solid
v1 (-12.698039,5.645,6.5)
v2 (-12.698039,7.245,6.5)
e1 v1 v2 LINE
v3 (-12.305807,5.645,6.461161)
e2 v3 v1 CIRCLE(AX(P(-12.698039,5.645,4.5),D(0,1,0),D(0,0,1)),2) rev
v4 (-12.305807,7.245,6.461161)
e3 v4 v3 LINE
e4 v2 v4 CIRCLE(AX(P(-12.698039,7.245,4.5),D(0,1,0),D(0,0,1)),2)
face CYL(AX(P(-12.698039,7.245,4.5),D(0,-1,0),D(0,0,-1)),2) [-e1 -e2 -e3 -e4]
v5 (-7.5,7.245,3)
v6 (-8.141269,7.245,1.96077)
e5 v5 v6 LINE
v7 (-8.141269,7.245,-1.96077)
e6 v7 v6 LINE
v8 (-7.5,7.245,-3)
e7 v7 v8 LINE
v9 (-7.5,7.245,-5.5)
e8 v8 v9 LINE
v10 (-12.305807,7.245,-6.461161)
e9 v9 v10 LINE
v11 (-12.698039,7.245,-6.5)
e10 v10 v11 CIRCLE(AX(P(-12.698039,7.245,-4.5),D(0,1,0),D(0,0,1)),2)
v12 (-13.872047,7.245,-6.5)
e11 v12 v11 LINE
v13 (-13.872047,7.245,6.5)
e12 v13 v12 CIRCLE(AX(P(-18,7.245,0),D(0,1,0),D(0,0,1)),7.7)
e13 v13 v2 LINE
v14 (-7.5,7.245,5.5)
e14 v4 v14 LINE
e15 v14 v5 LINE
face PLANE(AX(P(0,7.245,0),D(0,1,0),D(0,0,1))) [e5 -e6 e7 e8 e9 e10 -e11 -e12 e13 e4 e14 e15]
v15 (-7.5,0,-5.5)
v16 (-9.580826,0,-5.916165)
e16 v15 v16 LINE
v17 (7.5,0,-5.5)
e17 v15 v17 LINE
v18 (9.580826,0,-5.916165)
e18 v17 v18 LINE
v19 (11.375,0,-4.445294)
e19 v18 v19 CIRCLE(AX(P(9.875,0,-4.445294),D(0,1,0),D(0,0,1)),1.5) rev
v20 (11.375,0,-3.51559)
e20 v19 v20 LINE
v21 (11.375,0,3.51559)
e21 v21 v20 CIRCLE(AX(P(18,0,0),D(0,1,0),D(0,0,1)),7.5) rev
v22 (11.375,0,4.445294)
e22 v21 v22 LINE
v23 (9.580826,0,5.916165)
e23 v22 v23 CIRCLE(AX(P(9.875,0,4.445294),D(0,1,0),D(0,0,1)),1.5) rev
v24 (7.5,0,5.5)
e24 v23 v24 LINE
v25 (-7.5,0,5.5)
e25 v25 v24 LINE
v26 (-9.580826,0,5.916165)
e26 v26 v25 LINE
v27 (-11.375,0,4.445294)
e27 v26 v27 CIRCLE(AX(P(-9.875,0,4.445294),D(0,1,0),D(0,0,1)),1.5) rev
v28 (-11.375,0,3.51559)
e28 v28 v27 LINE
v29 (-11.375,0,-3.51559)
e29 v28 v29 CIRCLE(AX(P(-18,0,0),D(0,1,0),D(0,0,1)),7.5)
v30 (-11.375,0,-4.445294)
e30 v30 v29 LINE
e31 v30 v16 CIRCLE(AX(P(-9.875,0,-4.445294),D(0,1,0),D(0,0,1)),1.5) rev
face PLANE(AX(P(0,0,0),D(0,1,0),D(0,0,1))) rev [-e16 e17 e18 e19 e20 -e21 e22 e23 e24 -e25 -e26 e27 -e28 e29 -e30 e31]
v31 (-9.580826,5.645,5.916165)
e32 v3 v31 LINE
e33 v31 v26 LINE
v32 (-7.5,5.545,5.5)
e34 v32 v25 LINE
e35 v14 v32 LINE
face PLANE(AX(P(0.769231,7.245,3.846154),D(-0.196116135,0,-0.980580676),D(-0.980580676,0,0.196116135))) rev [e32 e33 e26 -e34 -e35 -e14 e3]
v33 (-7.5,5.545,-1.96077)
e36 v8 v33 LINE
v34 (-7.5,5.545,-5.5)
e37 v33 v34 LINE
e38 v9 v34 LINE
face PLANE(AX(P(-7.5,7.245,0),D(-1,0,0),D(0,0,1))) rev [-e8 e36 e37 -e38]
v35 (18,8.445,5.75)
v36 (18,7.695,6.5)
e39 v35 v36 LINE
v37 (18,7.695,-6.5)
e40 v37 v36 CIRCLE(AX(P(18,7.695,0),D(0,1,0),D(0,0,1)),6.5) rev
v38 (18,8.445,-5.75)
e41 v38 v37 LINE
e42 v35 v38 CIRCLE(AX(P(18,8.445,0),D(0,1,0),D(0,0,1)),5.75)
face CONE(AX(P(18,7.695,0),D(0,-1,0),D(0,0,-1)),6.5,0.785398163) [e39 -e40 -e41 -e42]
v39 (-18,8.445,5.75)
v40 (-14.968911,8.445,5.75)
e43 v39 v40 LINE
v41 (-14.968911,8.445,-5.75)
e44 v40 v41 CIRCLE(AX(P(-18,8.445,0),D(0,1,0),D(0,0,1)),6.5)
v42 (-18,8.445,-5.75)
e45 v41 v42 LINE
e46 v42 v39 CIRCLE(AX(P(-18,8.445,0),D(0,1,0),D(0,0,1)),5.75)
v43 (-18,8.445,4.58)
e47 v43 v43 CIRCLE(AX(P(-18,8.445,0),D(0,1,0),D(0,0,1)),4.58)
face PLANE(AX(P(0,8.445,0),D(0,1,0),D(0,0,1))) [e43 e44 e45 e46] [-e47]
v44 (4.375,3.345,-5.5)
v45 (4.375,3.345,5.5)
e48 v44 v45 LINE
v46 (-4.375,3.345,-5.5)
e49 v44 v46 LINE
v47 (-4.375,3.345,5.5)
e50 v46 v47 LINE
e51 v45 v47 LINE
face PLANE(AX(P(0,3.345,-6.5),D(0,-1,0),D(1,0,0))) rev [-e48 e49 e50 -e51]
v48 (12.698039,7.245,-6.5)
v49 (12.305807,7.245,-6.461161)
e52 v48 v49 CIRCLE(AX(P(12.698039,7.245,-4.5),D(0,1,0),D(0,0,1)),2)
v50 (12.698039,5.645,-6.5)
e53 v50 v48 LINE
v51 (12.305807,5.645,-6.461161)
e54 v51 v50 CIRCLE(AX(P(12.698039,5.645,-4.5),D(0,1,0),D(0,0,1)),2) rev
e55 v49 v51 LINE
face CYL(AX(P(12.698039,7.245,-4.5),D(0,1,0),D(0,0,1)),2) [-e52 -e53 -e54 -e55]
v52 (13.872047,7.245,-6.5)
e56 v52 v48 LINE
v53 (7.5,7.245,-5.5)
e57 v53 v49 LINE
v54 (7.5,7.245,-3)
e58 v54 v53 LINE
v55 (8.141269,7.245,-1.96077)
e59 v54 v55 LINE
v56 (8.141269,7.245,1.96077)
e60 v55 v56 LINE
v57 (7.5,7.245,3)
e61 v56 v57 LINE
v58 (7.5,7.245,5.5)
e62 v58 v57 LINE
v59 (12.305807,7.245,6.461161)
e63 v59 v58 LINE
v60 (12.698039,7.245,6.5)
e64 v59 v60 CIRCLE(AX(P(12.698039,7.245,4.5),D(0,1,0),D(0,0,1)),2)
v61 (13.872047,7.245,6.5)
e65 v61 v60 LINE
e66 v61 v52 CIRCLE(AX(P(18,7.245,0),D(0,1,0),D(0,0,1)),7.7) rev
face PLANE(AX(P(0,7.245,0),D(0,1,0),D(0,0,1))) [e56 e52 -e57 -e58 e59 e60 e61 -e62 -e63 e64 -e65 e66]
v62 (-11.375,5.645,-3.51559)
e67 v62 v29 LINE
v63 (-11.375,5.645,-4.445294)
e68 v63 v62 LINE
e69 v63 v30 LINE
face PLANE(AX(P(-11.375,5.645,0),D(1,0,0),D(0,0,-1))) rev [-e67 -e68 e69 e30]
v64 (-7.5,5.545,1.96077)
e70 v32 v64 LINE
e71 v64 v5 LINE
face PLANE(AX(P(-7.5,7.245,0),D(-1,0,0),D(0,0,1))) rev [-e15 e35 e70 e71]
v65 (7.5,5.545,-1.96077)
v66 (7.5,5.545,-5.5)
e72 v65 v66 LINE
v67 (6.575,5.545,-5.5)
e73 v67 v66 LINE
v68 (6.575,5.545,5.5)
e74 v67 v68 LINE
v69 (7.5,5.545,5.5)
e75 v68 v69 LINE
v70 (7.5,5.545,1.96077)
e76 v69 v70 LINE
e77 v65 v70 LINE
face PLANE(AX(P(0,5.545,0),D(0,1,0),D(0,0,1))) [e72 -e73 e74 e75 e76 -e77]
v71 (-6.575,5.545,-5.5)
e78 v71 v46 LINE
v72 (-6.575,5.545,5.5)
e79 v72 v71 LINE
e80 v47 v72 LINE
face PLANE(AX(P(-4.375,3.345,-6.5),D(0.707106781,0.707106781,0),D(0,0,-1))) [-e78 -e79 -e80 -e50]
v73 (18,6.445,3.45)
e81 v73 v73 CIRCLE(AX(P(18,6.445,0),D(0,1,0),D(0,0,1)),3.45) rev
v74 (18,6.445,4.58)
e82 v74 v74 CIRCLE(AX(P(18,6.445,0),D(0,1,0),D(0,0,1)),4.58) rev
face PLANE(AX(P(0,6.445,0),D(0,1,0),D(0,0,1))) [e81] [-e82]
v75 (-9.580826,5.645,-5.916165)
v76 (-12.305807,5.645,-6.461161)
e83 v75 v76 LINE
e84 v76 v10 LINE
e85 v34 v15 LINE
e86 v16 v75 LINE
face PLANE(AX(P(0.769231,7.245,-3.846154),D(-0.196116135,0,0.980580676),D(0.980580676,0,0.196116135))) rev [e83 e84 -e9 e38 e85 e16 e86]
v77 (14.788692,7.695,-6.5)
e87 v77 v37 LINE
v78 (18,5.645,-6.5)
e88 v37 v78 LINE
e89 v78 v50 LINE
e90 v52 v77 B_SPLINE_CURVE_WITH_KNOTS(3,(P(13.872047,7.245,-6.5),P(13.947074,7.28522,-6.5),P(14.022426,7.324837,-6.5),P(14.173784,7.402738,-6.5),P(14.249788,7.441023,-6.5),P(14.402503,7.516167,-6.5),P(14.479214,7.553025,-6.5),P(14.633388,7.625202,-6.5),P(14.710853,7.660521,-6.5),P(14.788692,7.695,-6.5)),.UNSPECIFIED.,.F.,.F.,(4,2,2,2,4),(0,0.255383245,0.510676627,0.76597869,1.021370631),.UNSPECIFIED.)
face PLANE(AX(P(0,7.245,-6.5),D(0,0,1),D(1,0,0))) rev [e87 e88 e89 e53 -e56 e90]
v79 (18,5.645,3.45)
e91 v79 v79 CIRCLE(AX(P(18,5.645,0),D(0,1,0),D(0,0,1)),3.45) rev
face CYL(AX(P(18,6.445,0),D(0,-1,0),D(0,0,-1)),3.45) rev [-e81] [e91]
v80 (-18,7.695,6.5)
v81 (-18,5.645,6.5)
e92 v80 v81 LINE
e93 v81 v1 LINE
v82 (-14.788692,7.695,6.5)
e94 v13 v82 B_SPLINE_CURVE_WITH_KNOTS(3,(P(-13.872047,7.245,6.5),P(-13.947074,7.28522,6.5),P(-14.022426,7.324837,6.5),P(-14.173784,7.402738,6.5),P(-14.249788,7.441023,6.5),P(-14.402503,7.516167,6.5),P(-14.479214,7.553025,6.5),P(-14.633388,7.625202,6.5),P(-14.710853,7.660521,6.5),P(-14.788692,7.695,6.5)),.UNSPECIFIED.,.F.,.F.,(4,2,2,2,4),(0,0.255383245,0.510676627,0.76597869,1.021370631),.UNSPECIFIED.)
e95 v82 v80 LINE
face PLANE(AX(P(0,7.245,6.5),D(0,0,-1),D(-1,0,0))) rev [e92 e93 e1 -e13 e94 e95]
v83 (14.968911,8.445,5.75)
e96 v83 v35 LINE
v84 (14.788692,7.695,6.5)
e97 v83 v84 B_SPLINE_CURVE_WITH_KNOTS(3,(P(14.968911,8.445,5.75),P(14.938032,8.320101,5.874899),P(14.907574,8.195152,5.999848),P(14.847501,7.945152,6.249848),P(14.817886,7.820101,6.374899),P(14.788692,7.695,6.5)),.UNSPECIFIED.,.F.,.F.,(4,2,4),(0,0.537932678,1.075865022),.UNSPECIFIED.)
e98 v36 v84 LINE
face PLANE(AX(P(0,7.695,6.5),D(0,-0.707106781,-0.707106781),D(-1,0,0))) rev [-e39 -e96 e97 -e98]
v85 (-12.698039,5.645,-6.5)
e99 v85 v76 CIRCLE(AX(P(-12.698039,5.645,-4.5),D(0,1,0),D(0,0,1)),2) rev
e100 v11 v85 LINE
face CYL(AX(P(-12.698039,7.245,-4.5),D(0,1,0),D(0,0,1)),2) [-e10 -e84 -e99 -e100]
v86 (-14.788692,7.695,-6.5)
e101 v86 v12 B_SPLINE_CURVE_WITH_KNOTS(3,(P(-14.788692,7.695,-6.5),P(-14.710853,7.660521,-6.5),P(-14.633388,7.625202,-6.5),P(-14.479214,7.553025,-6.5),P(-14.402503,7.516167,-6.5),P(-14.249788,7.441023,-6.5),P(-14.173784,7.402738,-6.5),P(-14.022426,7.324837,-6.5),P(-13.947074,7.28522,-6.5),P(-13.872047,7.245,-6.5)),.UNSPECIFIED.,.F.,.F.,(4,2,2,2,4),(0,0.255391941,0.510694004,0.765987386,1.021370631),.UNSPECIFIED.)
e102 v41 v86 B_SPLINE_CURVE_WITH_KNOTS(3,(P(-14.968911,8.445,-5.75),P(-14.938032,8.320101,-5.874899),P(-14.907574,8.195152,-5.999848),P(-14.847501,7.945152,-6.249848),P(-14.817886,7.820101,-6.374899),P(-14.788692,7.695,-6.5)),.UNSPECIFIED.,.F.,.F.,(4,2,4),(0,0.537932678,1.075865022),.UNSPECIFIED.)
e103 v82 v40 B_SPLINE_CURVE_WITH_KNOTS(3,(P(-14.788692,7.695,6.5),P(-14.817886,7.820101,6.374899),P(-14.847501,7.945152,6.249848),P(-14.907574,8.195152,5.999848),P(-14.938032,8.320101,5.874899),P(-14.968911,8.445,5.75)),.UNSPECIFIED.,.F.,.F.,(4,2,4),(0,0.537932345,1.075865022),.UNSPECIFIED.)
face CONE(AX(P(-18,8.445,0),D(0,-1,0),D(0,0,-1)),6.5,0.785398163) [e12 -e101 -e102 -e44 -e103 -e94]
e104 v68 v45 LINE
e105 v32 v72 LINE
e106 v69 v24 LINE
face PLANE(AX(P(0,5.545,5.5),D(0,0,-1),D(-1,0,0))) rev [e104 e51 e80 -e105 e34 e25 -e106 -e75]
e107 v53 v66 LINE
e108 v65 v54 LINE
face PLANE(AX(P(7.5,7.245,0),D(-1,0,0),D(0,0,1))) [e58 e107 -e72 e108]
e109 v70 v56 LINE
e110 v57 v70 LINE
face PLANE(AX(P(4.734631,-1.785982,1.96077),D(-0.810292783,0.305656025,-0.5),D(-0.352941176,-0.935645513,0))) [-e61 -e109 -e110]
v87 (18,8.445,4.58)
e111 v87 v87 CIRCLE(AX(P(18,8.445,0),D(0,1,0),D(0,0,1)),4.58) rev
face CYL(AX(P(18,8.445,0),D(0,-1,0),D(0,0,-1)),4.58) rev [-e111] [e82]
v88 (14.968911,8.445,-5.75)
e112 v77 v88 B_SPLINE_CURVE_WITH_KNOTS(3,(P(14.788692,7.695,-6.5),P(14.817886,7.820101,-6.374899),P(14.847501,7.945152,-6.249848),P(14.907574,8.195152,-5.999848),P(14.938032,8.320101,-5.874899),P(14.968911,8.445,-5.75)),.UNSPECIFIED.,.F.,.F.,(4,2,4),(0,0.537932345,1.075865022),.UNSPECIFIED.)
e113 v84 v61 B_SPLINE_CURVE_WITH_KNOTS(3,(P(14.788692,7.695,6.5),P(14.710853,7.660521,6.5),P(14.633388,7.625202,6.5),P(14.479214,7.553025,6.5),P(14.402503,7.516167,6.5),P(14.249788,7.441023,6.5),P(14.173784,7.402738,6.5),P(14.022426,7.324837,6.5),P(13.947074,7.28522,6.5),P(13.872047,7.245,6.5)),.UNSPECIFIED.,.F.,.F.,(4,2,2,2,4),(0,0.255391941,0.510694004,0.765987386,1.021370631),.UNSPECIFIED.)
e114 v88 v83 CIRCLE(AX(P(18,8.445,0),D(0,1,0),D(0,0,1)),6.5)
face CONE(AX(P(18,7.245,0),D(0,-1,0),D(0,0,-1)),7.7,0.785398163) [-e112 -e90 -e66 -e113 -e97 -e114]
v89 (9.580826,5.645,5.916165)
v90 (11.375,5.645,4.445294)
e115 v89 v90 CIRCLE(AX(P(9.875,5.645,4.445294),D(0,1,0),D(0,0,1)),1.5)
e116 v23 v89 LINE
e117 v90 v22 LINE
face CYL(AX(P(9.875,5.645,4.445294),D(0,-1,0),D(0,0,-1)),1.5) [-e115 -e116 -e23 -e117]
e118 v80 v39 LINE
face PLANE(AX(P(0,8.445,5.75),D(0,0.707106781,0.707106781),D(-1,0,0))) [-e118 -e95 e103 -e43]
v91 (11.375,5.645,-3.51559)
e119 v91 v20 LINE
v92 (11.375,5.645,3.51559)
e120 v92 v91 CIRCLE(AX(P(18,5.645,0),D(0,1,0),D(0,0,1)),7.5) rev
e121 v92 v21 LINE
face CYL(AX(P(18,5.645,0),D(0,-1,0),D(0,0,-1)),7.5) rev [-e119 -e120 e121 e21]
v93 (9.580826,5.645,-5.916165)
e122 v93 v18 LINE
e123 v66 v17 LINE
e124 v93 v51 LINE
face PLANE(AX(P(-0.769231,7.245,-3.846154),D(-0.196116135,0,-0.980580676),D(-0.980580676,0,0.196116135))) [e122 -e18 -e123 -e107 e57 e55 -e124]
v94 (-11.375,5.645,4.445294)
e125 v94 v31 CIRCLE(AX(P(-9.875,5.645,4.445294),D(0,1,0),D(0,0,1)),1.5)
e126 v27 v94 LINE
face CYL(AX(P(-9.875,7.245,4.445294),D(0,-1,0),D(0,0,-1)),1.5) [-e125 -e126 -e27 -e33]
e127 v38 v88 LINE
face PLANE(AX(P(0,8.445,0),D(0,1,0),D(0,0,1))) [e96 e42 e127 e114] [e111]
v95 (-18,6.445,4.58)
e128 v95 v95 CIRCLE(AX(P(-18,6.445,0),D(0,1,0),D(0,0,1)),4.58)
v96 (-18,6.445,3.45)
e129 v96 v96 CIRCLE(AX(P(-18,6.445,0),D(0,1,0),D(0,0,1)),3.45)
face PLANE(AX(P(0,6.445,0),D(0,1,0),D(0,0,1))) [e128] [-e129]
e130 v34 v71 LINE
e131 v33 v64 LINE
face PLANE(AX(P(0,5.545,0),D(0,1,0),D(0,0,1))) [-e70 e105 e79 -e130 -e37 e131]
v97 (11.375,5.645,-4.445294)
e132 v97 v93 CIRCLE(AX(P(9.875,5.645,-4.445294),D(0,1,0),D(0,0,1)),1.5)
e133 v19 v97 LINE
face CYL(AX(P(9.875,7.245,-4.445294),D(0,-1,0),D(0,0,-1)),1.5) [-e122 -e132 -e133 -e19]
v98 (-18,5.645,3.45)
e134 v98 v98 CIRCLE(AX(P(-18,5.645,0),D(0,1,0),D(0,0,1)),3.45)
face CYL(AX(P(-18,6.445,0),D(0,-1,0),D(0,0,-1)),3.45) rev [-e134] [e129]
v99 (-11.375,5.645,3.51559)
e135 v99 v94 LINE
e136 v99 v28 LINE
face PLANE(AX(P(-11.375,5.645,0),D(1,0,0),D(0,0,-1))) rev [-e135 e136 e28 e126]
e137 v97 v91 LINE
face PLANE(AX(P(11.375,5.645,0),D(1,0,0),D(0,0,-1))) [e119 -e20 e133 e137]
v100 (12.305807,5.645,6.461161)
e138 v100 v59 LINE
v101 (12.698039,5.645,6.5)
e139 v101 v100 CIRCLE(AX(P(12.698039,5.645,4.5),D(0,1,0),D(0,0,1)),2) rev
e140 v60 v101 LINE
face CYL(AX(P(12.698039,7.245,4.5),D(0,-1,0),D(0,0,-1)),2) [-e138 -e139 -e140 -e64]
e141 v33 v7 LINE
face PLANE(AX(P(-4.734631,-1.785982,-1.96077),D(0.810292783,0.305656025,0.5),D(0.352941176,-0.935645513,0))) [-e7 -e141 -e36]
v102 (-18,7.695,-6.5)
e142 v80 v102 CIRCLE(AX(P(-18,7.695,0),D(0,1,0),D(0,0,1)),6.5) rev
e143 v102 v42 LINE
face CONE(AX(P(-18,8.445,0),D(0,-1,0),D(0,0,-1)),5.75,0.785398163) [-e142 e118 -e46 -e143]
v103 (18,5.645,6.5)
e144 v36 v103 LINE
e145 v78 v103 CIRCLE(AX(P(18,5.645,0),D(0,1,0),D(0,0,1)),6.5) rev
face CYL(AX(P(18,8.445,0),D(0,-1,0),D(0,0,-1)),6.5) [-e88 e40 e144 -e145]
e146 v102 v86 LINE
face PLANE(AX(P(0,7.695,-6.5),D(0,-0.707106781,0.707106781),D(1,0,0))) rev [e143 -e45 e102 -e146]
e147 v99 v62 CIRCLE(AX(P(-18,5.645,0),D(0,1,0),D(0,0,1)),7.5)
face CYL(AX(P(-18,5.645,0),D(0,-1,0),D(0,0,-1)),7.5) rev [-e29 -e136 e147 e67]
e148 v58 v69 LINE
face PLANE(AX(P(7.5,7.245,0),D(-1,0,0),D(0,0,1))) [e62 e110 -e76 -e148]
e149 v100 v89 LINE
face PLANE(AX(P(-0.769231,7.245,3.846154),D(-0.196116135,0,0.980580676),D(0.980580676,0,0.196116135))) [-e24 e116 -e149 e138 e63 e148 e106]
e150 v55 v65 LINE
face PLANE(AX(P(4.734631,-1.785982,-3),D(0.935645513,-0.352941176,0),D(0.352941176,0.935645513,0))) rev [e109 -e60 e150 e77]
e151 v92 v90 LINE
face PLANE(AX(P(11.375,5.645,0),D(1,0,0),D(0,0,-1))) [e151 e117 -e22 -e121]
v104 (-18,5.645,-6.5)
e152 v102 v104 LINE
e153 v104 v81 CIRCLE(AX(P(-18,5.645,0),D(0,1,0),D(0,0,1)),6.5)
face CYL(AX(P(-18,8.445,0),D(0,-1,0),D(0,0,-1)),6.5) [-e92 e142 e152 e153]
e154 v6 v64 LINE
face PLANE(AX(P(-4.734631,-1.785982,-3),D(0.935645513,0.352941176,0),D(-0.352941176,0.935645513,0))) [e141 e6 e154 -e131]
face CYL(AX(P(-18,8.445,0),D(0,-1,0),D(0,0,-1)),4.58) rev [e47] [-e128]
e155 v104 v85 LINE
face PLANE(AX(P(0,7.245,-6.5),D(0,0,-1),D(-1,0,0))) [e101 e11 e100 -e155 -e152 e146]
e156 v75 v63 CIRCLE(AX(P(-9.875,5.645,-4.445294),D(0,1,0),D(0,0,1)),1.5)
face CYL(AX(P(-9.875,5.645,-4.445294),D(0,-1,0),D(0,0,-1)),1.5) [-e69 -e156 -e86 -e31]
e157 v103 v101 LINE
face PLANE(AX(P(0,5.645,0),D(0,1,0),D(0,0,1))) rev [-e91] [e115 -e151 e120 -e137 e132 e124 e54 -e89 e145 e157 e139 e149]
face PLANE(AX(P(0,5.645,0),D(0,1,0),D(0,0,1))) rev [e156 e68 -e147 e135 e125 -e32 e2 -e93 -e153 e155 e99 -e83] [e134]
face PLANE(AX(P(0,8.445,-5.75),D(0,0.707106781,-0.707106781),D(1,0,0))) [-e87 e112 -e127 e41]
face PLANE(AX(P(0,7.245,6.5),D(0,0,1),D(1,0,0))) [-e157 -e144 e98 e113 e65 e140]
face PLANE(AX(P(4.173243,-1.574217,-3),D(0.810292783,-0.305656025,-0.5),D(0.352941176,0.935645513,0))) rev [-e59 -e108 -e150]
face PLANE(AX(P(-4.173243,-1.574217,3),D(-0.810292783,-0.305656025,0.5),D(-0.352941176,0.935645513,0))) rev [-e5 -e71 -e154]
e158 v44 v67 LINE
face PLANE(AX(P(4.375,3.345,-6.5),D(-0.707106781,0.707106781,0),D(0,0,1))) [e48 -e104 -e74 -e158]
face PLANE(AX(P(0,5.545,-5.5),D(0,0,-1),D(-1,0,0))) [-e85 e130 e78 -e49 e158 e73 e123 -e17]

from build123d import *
from OCP.BRepFilletAPI import BRepFilletAPI_MakeChamfer

# Parameters (mm, degrees)
SKETCH1_W               = 15
SKETCH1_H               = 11
BOSS_EXTRUDE1_DEPTH     = 5.545
BOSS_EXTRUDE2_DEPTH     = 7.245
SKETCH1_6_R             = 6.5
SKETCH1_6_R_2           = 4.58
BOSS_EXTRUDE3_DEPTH     = 8.445
SKETCH1_7_R             = 4.58
SKETCH1_7_R_2           = 3.45
BOSS_EXTRUDE4_DEPTH     = 6.445
SKETCH1_8_R             = 6.5
SKETCH1_8_R_2           = 4.58
SKETCH1_8_R_3           = 3.45
CUT_EXTRUDE1_DEPTH      = 5.645
CUT_EXTRUDE2_DEPTH      = 3
CUT_EXTRUDE3_DEPTH      = 27.717373093
CUT_EXTRUDE3_DEPTH_BACK = 27.717373093
SKETCH2_4_W             = 8.75
SKETCH2_4_H             = 2.2
CHAMFER1_SIZE           = 1.039230485
CHAMFER1_SIZE_2         = 0.6
CHAMFER2_SIZE           = 2.2
CHAMFER3_SIZE           = 0.75
CHAMFER4_SIZE           = 1.2
FILLET1_R               = 2
FILLET2_R               = 1.5


with BuildPart() as part:
    # Sketch1 → Boss-Extrude1 (new body)
    with BuildSketch(Plane(origin=(0, 0, 0), x_dir=(1, 0, 0), z_dir=(0, 1, 0))):
        Rectangle(SKETCH1_W, SKETCH1_H)
    extrude(amount=BOSS_EXTRUDE1_DEPTH)

    # Sketch1<5> → Boss-Extrude2 (add)
    with BuildSketch(Plane(origin=(0, 0, 0), x_dir=(1, 0, 0), z_dir=(0, 1, 0))):
        with BuildLine():
            Line((-12.5, 6.5), (-13.872046512, 6.5))
            ThreePointArc((-13.872046512, 6.5), (-12.47142118, 5.359553734), (-11.375, 3.924203741))
            Line((-11.375, 3.924203741), (-11.375, 6.275))
            Line((-11.375, 6.275), (-12.5, 6.5))
        make_face()
        with BuildLine():
            Line((-11.375, 6.275), (-11.375, 3.924203741))
            ThreePointArc((-11.375, 3.924203741), (-10.3, 0), (-11.375, -3.924203741))
            Line((-11.375, -3.924203741), (-11.375, -6.275))
            Line((-11.375, -6.275), (-7.5, -5.5))
            Line((-7.5, -5.5), (-7.5, 5.5))
            Line((-7.5, 5.5), (-11.375, 6.275))
        make_face()
        with BuildLine():
            ThreePointArc((-11.375, -3.924203741), (-12.47142118, -5.359553734), (-13.872046512, -6.5))
            Line((-13.872046512, -6.5), (-12.5, -6.5))
            Line((-12.5, -6.5), (-11.375, -6.275))
            Line((-11.375, -6.275), (-11.375, -3.924203741))
        make_face()
        with BuildLine():
            Line((12.5, 6.5), (11.375, 6.275))
            Line((11.375, 6.275), (11.375, 3.924203741))
            ThreePointArc((11.375, 3.924203741), (12.47142118, 5.359553734), (13.872046512, 6.5))
            Line((13.872046512, 6.5), (12.5, 6.5))
        make_face()
        with BuildLine():
            Line((11.375, 6.275), (7.5, 5.5))
            Line((7.5, 5.5), (7.5, -5.5))
            Line((7.5, -5.5), (11.375, -6.275))
            Line((11.375, -6.275), (11.375, -3.924203741))
            ThreePointArc((11.375, -3.924203741), (10.3, 0), (11.375, 3.924203741))
            Line((11.375, 3.924203741), (11.375, 6.275))
        make_face()
        with BuildLine():
            Line((11.375, -3.924203741), (11.375, -6.275))
            Line((11.375, -6.275), (12.5, -6.5))
            Line((12.5, -6.5), (13.872046512, -6.5))
            ThreePointArc((13.872046512, -6.5), (12.47142118, -5.359553734), (11.375, -3.924203741))
        make_face()
    extrude(amount=BOSS_EXTRUDE2_DEPTH)

    # Sketch1<6> → Boss-Extrude3 (add)
    # profile 1 of 6: a face of its own
    with BuildSketch(Plane(origin=(0, 0, 0), x_dir=(1, 0, 0), z_dir=(0, 1, 0))):
        with BuildLine():
            Line((-13.872046512, 6.5), (-18, 6.5))
            ThreePointArc((-18, 6.5), (-13.403805922, 4.596194078), (-11.5, 0))
            ThreePointArc((-11.5, 0), (-13.403805922, -4.596194078), (-18, -6.5))
            Line((-18, -6.5), (-13.872046512, -6.5))
            ThreePointArc((-13.872046512, -6.5), (-12.47142118, -5.359553734), (-11.375, -3.924203741))
            Line((-11.375, -3.924203741), (-11.375, -3.515590278))
            ThreePointArc((-11.375, -3.515590278), (-10.5, 0), (-11.375, 3.515590278))
            Line((-11.375, 3.515590278), (-11.375, 3.924203741))
            ThreePointArc((-11.375, 3.924203741), (-12.47142118, 5.359553734), (-13.872046512, 6.5))
        make_face()
    # profile 2 of 6: a face of its own
    with BuildSketch(Plane(origin=(0, 0, 0), x_dir=(1, 0, 0), z_dir=(0, 1, 0))):
        with Locations((-18, 0)):
            Circle(SKETCH1_6_R)
        with Locations(Location((-18, 0, 0), (0, 0, 270))):
            Circle(SKETCH1_6_R_2, mode=Mode.SUBTRACT)
    # profile 3 of 6: a face of its own
    with BuildSketch(Plane(origin=(0, 0, 0), x_dir=(1, 0, 0), z_dir=(0, 1, 0))):
        with BuildLine():
            ThreePointArc((13.872046512, 6.5), (12.47142118, 5.359553734), (11.375, 3.924203741))
            Line((11.375, 3.924203741), (11.375, 3.515590278))
            ThreePointArc((11.375, 3.515590278), (10.5, 0), (11.375, -3.515590278))
            Line((11.375, -3.515590278), (11.375, -3.924203741))
            ThreePointArc((11.375, -3.924203741), (12.47142118, -5.359553734), (13.872046512, -6.5))
            Line((13.872046512, -6.5), (18, -6.5))
            ThreePointArc((18, -6.5), (11.5, 0), (18, 6.5))
            Line((18, 6.5), (13.872046512, 6.5))
        make_face()
    # profile 4 of 6: a face of its own
    with BuildSketch(Plane(origin=(0, 0, 0), x_dir=(1, 0, 0), z_dir=(0, 1, 0))):
        with Locations((18, 0)):
            Circle(SKETCH1_6_R)
        with Locations(Location((18, 0, 0), (0, 0, 270))):
            Circle(SKETCH1_6_R_2, mode=Mode.SUBTRACT)
    # profile 5 of 6: a face of its own
    with BuildSketch(Plane(origin=(0, 0, 0), x_dir=(1, 0, 0), z_dir=(0, 1, 0))):
        with BuildLine():
            Line((11.375, 3.515590278), (11.375, 3.924203741))
            ThreePointArc((11.375, 3.924203741), (10.3, 0), (11.375, -3.924203741))
            Line((11.375, -3.924203741), (11.375, -3.515590278))
            ThreePointArc((11.375, -3.515590278), (10.5, 0), (11.375, 3.515590278))
        make_face()
    # profile 6 of 6: a face of its own
    with BuildSketch(Plane(origin=(0, 0, 0), x_dir=(1, 0, 0), z_dir=(0, 1, 0))):
        with BuildLine():
            ThreePointArc((-11.375, -3.924203741), (-10.3, 0), (-11.375, 3.924203741))
            Line((-11.375, 3.924203741), (-11.375, 3.515590278))
            ThreePointArc((-11.375, 3.515590278), (-10.5, 0), (-11.375, -3.515590278))
            Line((-11.375, -3.515590278), (-11.375, -3.924203741))
        make_face()
    extrude(amount=BOSS_EXTRUDE3_DEPTH)

    # Sketch1<7> → Boss-Extrude4 (add)
    # profile 1 of 2: a face of its own
    with BuildSketch(Plane(origin=(0, 0, 0), x_dir=(1, 0, 0), z_dir=(0, 1, 0))):
        with Locations(Location((-18, 0, 0), (0, 0, 270))):
            Circle(SKETCH1_7_R)
        with Locations(Location((-18, 0, 0), (0, 0, 270))):
            Circle(SKETCH1_7_R_2, mode=Mode.SUBTRACT)
    # profile 2 of 2: a face of its own
    with BuildSketch(Plane(origin=(0, 0, 0), x_dir=(1, 0, 0), z_dir=(0, 1, 0))):
        with Locations(Location((18, 0, 0), (0, 0, 270))):
            Circle(SKETCH1_7_R)
        with Locations(Location((18, 0, 0), (0, 0, 270))):
            Circle(SKETCH1_7_R_2, mode=Mode.SUBTRACT)
    extrude(amount=BOSS_EXTRUDE4_DEPTH)

    # Sketch1<8> → Cut-Extrude1 (cut)
    # profile 1 of 10: a face of its own
    with BuildSketch(Plane(origin=(0, 0, 0), x_dir=(1, 0, 0), z_dir=(0, 1, 0))):
        with Locations((-18, 0)):
            Circle(SKETCH1_8_R)
        with Locations(Location((-18, 0, 0), (0, 0, 270))):
            Circle(SKETCH1_8_R_2, mode=Mode.SUBTRACT)
    # profile 2 of 10: a face of its own
    with BuildSketch(Plane(origin=(0, 0, 0), x_dir=(1, 0, 0), z_dir=(0, 1, 0))):
        with Locations(Location((-18, 0, 0), (0, 0, 270))):
            Circle(SKETCH1_8_R_2)
        with Locations(Location((-18, 0, 0), (0, 0, 270))):
            Circle(SKETCH1_8_R_3, mode=Mode.SUBTRACT)
    # profile 3 of 10: a face of its own
    with BuildSketch(Plane(origin=(0, 0, 0), x_dir=(1, 0, 0), z_dir=(0, 1, 0))):
        with BuildLine():
            Line((-13.872046512, 6.5), (-18, 6.5))
            ThreePointArc((-18, 6.5), (-13.403805922, 4.596194078), (-11.5, 0))
            ThreePointArc((-11.5, 0), (-13.403805922, -4.596194078), (-18, -6.5))
            Line((-18, -6.5), (-13.872046512, -6.5))
            ThreePointArc((-13.872046512, -6.5), (-12.47142118, -5.359553734), (-11.375, -3.924203741))
            Line((-11.375, -3.924203741), (-11.375, -3.515590278))
            ThreePointArc((-11.375, -3.515590278), (-10.5, 0), (-11.375, 3.515590278))
            Line((-11.375, 3.515590278), (-11.375, 3.924203741))
            ThreePointArc((-11.375, 3.924203741), (-12.47142118, 5.359553734), (-13.872046512, 6.5))
        make_face()
    # profile 4 of 10: a face of its own
    with BuildSketch(Plane(origin=(0, 0, 0), x_dir=(1, 0, 0), z_dir=(0, 1, 0))):
        with BuildLine():
            Line((-12.5, 6.5), (-13.872046512, 6.5))
            ThreePointArc((-13.872046512, 6.5), (-12.47142118, 5.359553734), (-11.375, 3.924203741))
            Line((-11.375, 3.924203741), (-11.375, 6.275))
            Line((-11.375, 6.275), (-12.5, 6.5))
        make_face()
    # profile 5 of 10: a face of its own
    with BuildSketch(Plane(origin=(0, 0, 0), x_dir=(1, 0, 0), z_dir=(0, 1, 0))):
        with BuildLine():
            ThreePointArc((-11.375, -3.924203741), (-12.47142118, -5.359553734), (-13.872046512, -6.5))
            Line((-13.872046512, -6.5), (-12.5, -6.5))
            Line((-12.5, -6.5), (-11.375, -6.275))
            Line((-11.375, -6.275), (-11.375, -3.924203741))
        make_face()
    # profile 6 of 10: a face of its own
    with BuildSketch(Plane(origin=(0, 0, 0), x_dir=(1, 0, 0), z_dir=(0, 1, 0))):
        with BuildLine():
            Line((12.5, 6.5), (11.375, 6.275))
            Line((11.375, 6.275), (11.375, 3.924203741))
            ThreePointArc((11.375, 3.924203741), (12.47142118, 5.359553734), (13.872046512, 6.5))
            Line((13.872046512, 6.5), (12.5, 6.5))
        make_face()
    # profile 7 of 10: a face of its own
    with BuildSketch(Plane(origin=(0, 0, 0), x_dir=(1, 0, 0), z_dir=(0, 1, 0))):
        with BuildLine():
            Line((11.375, -3.924203741), (11.375, -6.275))
            Line((11.375, -6.275), (12.5, -6.5))
            Line((12.5, -6.5), (13.872046512, -6.5))
            ThreePointArc((13.872046512, -6.5), (12.47142118, -5.359553734), (11.375, -3.924203741))
        make_face()
    # profile 8 of 10: a face of its own
    with BuildSketch(Plane(origin=(0, 0, 0), x_dir=(1, 0, 0), z_dir=(0, 1, 0))):
        with BuildLine():
            ThreePointArc((13.872046512, 6.5), (12.47142118, 5.359553734), (11.375, 3.924203741))
            Line((11.375, 3.924203741), (11.375, 3.515590278))
            ThreePointArc((11.375, 3.515590278), (10.5, 0), (11.375, -3.515590278))
            Line((11.375, -3.515590278), (11.375, -3.924203741))
            ThreePointArc((11.375, -3.924203741), (12.47142118, -5.359553734), (13.872046512, -6.5))
            Line((13.872046512, -6.5), (18, -6.5))
            ThreePointArc((18, -6.5), (11.5, 0), (18, 6.5))
            Line((18, 6.5), (13.872046512, 6.5))
        make_face()
    # profile 9 of 10: a face of its own
    with BuildSketch(Plane(origin=(0, 0, 0), x_dir=(1, 0, 0), z_dir=(0, 1, 0))):
        with Locations((18, 0)):
            Circle(SKETCH1_8_R)
        with Locations(Location((18, 0, 0), (0, 0, 270))):
            Circle(SKETCH1_8_R_2, mode=Mode.SUBTRACT)
    # profile 10 of 10: a face of its own
    with BuildSketch(Plane(origin=(0, 0, 0), x_dir=(1, 0, 0), z_dir=(0, 1, 0))):
        with Locations(Location((18, 0, 0), (0, 0, 270))):
            Circle(SKETCH1_8_R_2)
        with Locations(Location((18, 0, 0), (0, 0, 270))):
            Circle(SKETCH1_8_R_3, mode=Mode.SUBTRACT)
    extrude(amount=CUT_EXTRUDE1_DEPTH, mode=Mode.SUBTRACT)

    # Sketch2 → Cut-Extrude2 (cut, symmetric)
    with BuildSketch(Plane.XY):
        Polygon((-7.5, 5.545), (-8.141268506, 7.245), (-7.5, 7.245), align=None)
        Polygon((7.5, 5.545), (8.141268506, 7.245), (7.5, 7.245), align=None)
    extrude(amount=CUT_EXTRUDE2_DEPTH, both=True, mode=Mode.SUBTRACT)

    # Sketch2<4> → Cut-Extrude3 (cut, two sides: drawn at the far end of the back side and taken through both)
    with BuildSketch(Plane.XY.offset(-CUT_EXTRUDE3_DEPTH_BACK)):
        with Locations((0, 4.445)):
            Rectangle(SKETCH2_4_W, SKETCH2_4_H)
    extrude(amount=CUT_EXTRUDE3_DEPTH + CUT_EXTRUDE3_DEPTH_BACK, mode=Mode.SUBTRACT)

    # Chamfer1
    chamfer1_edges_1 = [part.edges().sort_by_distance(p)[0] for p in [
        (7.820634253, 6.395, 3),
    ]]
    chamfer1_side_1 = [part.faces().sort_by_distance(p)[0] for p in [
        (7.820634253, 6.395, 2.988),
    ]]
    chamfer1_edges_2 = [part.edges().sort_by_distance(p)[0] for p in [
        (7.820634253, 6.395, -3),
    ]]
    chamfer1_side_2 = [part.faces().sort_by_distance(p)[0] for p in [
        (7.820634253, 6.395, -2.988),
    ]]
    chamfer1_edges_3 = [part.edges().sort_by_distance(p)[0] for p in [
        (-7.820634253, 6.395, 3),
    ]]
    chamfer1_side_3 = [part.faces().sort_by_distance(p)[0] for p in [
        (-7.820634253, 6.395, 2.988),
    ]]
    chamfer1_edges_4 = [part.edges().sort_by_distance(p)[0] for p in [
        (-7.820634253, 6.395, -3),
    ]]
    chamfer1_side_4 = [part.faces().sort_by_distance(p)[0] for p in [
        (-7.820634253, 6.395, -2.988),
    ]]
    chamfer1 = BRepFilletAPI_MakeChamfer(part.part.solid().wrapped)
    for e in chamfer1_edges_1:
        chamfer1.Add(CHAMFER1_SIZE - 0.0001, CHAMFER1_SIZE_2 - 0.0001, e.wrapped, chamfer1_side_1[0].wrapped)
    for e in chamfer1_edges_2:
        chamfer1.Add(CHAMFER1_SIZE - 0.0001, CHAMFER1_SIZE_2 - 0.0001, e.wrapped, chamfer1_side_2[0].wrapped)
    for e in chamfer1_edges_3:
        chamfer1.Add(CHAMFER1_SIZE - 0.0001, CHAMFER1_SIZE_2 - 0.0001, e.wrapped, chamfer1_side_3[0].wrapped)
    for e in chamfer1_edges_4:
        chamfer1.Add(CHAMFER1_SIZE - 0.0001, CHAMFER1_SIZE_2 - 0.0001, e.wrapped, chamfer1_side_4[0].wrapped)
    add(Compound.cast(chamfer1.Shape()), mode=Mode.REPLACE)  # a hair under: the kernel refuses the full size

    # Chamfer2
    chamfer2_edges = [part.edges().sort_by_distance(p)[0] for p in [
        (4.375, 5.545, 0),
        (-4.375, 5.545, 0),
    ]]
    chamfer(chamfer2_edges, length=CHAMFER2_SIZE - 0.0001)  # a hair under: the kernel refuses the full size

    # Chamfer3
    chamfer3_edges = [part.edges().sort_by_distance(p)[0] for p in [
        (15.936023256, 8.445, 6.5),
        (24.5, 8.445, 0),
        (15.936023256, 8.445, -6.5),
        (-15.936023256, 8.445, -6.5),
        (-24.5, 8.445, 0),
        (-15.936023256, 8.445, 6.5),
    ]]
    chamfer(chamfer3_edges, length=CHAMFER3_SIZE)

    # Chamfer4
    chamfer4_edges = [part.edges().sort_by_distance(p)[0] for p in [
        (-10.3, 8.445, 0),
        (10.3, 8.445, 0),
    ]]
    chamfer(chamfer4_edges, length=CHAMFER4_SIZE - 0.0001)  # a hair under: the kernel refuses the full size

    # Fillet1
    fillet1_edges = [part.edges().sort_by_distance(p)[0] for p in [
        (-12.5, 6.445, 6.5),
        (-12.5, 6.445, -6.5),
        (12.5, 6.445, -6.5),
        (12.5, 6.445, 6.5),
    ]]
    fillet(fillet1_edges, radius=FILLET1_R)

    # Fillet2
    fillet2_edges = [part.edges().sort_by_distance(p)[0] for p in [
        (-11.375, 2.8225, 6.275),
        (-11.375, 2.8225, -6.275),
        (11.375, 2.8225, -6.275),
        (11.375, 2.8225, 6.275),
    ]]
    fillet(fillet2_edges, radius=FILLET2_R)


solid = part.part
